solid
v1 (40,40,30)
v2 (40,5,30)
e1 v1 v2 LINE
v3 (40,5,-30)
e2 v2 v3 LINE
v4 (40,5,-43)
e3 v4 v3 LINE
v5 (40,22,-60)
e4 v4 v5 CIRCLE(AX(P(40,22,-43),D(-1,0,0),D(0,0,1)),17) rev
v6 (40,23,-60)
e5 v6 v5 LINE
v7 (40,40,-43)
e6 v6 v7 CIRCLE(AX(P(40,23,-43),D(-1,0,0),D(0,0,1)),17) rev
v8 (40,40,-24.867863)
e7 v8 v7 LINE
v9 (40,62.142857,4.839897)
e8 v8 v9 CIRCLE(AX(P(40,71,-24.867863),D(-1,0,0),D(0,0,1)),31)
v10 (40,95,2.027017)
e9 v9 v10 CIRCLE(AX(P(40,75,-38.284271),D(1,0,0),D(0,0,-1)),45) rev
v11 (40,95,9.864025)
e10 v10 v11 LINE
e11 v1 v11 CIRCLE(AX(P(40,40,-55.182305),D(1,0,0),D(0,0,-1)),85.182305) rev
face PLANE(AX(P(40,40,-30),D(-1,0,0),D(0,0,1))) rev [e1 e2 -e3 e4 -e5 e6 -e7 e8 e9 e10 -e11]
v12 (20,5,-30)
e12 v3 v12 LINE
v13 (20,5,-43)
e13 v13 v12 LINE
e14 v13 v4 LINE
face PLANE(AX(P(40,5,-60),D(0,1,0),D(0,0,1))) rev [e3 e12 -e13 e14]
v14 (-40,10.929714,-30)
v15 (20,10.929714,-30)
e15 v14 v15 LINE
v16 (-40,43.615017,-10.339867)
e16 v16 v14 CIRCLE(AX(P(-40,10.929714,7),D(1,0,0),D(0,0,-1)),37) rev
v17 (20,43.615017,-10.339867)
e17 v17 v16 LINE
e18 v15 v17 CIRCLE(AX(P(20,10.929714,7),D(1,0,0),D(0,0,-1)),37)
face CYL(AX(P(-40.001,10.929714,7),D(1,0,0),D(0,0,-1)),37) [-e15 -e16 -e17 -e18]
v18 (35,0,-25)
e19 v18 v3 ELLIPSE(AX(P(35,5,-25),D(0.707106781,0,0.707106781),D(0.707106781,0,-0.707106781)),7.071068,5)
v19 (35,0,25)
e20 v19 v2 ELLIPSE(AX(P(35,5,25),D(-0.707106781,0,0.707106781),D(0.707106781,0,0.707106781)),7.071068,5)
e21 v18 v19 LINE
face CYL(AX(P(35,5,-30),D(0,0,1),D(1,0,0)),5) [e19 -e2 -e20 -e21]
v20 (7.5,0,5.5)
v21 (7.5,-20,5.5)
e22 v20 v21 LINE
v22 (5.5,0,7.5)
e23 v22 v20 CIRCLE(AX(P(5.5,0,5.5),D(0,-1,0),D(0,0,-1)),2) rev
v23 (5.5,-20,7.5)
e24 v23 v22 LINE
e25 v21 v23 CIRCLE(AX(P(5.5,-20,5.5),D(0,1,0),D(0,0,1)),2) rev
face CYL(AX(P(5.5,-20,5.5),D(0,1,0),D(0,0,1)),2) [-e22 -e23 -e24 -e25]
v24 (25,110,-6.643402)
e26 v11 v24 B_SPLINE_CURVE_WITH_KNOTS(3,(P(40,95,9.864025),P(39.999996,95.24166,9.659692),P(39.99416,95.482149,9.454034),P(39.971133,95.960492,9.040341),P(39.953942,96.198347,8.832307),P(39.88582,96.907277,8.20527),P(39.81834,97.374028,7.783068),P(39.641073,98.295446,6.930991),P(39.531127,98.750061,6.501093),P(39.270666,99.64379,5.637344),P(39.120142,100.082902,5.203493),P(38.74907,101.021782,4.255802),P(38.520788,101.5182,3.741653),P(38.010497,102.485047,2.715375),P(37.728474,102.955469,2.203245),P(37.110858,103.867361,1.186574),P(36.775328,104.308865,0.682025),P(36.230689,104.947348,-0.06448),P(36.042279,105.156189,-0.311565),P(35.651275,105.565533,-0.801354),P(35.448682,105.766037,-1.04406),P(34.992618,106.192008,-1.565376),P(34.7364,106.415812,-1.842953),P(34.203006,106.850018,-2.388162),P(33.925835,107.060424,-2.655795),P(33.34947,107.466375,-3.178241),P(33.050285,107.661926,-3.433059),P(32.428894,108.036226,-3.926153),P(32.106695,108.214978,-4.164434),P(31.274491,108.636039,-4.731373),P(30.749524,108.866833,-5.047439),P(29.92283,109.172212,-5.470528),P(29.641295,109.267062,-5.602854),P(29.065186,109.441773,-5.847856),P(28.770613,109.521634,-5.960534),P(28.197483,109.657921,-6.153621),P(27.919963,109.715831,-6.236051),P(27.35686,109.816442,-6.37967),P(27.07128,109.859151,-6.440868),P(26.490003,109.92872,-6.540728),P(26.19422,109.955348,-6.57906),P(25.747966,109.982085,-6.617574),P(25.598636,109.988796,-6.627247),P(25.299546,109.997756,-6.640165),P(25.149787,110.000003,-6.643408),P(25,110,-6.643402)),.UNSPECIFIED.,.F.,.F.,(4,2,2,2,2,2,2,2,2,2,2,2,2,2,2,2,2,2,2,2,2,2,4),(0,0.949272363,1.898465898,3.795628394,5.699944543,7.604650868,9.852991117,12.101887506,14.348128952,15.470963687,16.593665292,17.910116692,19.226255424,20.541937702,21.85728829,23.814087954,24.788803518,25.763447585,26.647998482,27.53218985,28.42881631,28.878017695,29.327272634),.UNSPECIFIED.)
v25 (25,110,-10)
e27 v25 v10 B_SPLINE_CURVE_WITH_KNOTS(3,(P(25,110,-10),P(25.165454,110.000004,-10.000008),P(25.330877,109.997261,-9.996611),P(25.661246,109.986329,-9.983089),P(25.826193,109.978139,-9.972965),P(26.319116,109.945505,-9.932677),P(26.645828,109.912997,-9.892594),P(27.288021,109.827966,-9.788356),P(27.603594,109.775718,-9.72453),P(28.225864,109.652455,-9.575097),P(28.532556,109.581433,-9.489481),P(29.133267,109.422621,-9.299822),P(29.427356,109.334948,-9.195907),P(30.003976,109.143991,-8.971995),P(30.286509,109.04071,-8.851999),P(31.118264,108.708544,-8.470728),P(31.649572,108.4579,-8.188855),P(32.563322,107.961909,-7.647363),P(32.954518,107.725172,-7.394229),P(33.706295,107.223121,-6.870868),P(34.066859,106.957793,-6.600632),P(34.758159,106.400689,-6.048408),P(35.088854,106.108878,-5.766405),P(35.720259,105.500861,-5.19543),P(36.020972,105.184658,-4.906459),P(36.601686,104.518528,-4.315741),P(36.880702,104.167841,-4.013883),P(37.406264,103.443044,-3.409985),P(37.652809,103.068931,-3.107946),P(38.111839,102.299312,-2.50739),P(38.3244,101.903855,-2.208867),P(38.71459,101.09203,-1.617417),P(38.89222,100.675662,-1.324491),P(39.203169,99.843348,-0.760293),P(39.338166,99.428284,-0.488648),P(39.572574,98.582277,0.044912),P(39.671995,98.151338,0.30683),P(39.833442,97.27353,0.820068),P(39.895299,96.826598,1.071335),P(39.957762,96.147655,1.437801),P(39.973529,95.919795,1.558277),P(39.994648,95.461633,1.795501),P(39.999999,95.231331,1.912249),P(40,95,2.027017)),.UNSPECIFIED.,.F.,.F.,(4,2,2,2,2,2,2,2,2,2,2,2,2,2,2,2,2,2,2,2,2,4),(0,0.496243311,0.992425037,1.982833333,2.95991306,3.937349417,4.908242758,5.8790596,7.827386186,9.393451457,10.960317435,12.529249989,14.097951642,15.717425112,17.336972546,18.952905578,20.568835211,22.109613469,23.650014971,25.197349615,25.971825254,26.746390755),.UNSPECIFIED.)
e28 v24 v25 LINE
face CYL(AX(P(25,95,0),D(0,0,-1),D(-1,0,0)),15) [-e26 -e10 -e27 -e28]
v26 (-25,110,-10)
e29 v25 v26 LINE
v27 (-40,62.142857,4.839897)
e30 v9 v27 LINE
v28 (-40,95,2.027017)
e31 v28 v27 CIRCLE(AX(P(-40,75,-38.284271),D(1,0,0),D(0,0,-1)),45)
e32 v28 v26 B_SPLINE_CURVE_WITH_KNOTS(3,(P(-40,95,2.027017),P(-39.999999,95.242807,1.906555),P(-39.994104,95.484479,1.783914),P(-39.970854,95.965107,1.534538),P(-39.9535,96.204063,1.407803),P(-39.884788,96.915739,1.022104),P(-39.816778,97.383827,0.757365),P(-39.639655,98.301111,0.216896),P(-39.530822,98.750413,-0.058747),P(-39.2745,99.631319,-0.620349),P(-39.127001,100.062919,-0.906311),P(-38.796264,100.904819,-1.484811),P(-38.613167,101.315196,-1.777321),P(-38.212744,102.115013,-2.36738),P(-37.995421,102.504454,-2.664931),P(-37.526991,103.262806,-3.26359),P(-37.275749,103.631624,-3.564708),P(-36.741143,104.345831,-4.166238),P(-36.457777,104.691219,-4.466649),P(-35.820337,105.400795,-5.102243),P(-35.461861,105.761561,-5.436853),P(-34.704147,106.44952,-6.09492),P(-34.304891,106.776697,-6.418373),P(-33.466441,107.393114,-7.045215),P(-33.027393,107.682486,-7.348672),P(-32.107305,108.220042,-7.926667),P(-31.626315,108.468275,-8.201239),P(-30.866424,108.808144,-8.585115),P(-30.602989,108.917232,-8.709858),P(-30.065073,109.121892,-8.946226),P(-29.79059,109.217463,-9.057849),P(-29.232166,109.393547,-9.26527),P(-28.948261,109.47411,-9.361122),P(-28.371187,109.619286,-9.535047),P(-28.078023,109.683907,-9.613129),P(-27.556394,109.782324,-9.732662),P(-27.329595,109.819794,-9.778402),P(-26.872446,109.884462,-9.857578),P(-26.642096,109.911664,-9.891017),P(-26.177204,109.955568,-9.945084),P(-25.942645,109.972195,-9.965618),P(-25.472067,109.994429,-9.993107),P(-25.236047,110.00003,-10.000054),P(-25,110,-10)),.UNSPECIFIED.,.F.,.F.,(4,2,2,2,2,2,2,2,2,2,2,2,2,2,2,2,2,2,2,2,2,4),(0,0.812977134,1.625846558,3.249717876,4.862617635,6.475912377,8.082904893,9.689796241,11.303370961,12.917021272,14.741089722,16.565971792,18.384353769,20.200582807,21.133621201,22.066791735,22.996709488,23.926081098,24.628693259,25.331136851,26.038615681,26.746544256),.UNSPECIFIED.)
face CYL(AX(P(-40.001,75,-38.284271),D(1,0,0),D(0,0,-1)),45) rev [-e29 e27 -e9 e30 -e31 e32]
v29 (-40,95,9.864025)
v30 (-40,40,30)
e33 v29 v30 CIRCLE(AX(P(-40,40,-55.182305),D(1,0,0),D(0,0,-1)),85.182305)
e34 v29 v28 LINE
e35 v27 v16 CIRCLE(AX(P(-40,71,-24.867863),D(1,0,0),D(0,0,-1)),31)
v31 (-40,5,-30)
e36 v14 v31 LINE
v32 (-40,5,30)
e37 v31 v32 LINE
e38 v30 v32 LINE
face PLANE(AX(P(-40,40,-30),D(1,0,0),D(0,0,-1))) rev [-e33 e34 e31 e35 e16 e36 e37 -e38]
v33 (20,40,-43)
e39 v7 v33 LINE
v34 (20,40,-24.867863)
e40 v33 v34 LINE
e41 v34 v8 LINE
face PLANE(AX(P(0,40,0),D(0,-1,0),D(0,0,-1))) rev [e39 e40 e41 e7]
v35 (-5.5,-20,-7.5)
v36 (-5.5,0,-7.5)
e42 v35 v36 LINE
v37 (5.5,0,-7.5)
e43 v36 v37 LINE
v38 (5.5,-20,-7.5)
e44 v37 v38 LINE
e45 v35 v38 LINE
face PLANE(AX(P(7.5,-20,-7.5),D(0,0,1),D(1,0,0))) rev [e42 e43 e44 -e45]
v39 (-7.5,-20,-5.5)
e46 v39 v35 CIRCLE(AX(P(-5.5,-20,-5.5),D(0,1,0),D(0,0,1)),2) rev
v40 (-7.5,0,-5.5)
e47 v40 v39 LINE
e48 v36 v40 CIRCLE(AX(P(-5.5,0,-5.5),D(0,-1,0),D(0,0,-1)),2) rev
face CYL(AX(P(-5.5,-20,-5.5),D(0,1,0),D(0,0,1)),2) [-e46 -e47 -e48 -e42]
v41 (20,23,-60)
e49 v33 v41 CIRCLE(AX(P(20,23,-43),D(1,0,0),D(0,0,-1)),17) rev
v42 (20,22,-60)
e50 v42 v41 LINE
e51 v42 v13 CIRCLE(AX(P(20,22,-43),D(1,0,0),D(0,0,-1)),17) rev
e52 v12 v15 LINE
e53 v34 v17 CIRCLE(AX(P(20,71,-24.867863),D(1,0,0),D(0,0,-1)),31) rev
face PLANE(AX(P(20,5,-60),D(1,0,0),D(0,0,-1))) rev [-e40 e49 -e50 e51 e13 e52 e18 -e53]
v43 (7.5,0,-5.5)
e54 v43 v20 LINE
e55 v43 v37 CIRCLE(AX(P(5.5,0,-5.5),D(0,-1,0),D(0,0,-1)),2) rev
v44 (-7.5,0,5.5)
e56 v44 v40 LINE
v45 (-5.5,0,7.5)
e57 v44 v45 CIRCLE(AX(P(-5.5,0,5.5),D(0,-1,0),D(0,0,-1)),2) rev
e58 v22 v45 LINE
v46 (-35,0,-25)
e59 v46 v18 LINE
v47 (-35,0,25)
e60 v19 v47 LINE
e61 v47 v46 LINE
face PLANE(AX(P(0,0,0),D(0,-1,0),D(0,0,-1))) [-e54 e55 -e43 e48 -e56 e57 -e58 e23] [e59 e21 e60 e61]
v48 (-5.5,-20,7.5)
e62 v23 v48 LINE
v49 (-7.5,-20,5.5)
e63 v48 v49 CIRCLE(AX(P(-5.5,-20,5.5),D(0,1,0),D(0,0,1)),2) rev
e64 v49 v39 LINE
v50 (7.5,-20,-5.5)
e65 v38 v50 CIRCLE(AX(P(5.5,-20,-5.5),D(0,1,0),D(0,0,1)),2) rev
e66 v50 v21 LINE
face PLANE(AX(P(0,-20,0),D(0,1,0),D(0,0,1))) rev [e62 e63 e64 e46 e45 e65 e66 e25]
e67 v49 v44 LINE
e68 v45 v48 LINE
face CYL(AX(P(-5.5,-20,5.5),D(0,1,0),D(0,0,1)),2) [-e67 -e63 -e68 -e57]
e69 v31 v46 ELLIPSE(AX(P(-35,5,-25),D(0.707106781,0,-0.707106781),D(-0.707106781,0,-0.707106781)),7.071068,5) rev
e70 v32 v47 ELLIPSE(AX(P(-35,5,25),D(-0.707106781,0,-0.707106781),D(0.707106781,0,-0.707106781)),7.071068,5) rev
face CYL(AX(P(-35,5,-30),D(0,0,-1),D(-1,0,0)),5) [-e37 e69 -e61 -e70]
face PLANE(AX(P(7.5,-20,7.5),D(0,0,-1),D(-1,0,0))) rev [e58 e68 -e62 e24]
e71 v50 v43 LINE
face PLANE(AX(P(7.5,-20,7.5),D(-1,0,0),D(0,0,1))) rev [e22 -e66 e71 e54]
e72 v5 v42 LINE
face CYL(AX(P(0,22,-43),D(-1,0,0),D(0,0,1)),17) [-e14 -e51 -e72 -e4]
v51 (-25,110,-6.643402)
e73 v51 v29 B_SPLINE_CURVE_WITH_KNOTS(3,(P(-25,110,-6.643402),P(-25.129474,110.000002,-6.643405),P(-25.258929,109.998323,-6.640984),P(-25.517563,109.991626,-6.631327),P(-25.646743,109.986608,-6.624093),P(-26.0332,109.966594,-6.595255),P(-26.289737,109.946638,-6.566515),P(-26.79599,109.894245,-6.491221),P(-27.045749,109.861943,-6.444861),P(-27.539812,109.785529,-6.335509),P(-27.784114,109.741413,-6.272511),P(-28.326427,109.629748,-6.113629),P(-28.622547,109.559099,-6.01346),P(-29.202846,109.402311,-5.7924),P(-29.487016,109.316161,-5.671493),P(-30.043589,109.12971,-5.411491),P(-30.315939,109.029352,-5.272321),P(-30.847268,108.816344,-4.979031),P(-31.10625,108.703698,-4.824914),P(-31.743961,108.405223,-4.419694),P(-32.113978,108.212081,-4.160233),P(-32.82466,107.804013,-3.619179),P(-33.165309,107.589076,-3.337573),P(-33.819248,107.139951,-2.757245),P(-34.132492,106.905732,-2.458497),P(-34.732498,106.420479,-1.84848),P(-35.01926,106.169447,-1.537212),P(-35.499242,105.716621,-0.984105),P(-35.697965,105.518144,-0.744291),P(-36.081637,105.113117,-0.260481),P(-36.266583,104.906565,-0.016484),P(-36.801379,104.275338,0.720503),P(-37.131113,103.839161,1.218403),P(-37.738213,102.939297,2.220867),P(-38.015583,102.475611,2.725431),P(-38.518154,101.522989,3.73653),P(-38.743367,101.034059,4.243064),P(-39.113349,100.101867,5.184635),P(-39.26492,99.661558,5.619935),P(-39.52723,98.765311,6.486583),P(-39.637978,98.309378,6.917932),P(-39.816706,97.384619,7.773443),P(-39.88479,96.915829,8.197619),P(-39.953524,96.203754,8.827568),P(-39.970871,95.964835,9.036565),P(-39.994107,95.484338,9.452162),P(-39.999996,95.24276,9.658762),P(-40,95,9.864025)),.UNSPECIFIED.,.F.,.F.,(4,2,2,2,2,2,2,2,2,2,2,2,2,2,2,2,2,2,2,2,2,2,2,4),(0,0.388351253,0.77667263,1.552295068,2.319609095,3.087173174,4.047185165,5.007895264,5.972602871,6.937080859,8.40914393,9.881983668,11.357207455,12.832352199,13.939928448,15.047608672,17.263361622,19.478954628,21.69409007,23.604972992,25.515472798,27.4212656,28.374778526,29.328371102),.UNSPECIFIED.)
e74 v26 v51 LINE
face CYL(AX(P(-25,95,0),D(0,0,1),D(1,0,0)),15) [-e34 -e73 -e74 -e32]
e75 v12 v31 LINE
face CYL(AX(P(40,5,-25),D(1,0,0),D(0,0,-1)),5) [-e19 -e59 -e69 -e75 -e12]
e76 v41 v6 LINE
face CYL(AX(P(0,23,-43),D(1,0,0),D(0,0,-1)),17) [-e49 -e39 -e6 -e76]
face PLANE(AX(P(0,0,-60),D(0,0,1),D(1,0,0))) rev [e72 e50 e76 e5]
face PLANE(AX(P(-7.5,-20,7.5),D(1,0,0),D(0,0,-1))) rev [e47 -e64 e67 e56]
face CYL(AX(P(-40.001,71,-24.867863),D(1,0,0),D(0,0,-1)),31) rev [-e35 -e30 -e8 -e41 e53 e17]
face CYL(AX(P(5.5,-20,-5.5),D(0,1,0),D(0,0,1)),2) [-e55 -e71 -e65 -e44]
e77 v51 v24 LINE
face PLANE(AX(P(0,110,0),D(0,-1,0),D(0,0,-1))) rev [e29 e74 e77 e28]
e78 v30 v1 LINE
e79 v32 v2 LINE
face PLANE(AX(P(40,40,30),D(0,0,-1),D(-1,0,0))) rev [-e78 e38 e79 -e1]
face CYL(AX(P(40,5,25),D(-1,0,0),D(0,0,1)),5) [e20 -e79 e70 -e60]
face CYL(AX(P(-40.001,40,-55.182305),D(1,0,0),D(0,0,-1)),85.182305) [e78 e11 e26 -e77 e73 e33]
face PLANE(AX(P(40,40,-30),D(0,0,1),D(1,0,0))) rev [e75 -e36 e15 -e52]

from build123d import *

# Parameters (mm, degrees)
SKETCH1_W           = 80
SKETCH1_H           = 60
BOSS_EXTRUDE1_DEPTH = 40
SKETCH2_W           = 80
SKETCH2_H           = 40
BOSS_EXTRUDE2_DEPTH = 70
CUT_EXTRUDE1_REACH  = 141.284
FILLET4_R           = 31
FILLET6_R           = 5
FILLET7_R           = 15
SKETCH5_W           = 20
SKETCH5_H           = 35
BOSS_EXTRUDE4_DEPTH = 30
FILLET8_R           = 17
FILLET9_R           = 37
SKETCH6_W           = 15
SKETCH6_H           = 15
BOSS_EXTRUDE5_DEPTH = 20
FILLET10_R          = 2


with BuildPart() as part:
    # Sketch1 → Boss-Extrude1 (new body)
    with BuildSketch(Plane(origin=(0, 0, 0), x_dir=(1, 0, 0), z_dir=(0, 1, 0))):
        Rectangle(SKETCH1_W, SKETCH1_H)
    extrude(amount=BOSS_EXTRUDE1_DEPTH)

    # Sketch2 → Boss-Extrude2 (add)
    with BuildSketch(Plane(origin=(0, 40, 0), x_dir=(1, 0, 0), z_dir=(0, 1, 0))):
        with Locations((0, -10)):
            Rectangle(SKETCH2_W, SKETCH2_H)
    extrude(amount=BOSS_EXTRUDE2_DEPTH)

    # Sketch3 → Cut-Extrude1 (cut, up to next)
    with BuildSketch(Plane(origin=(40, 0, 0), x_dir=(0, 0, -1), z_dir=(1, 0, 0)), mode=Mode.PRIVATE) as cut_extrude1_sk1:
        with BuildLine():
            ThreePointArc((10, 110), (-6.715728753, 75), (10, 40))
            Line((10, 40), (10, 110))
        make_face()
    cut_extrude1_tool1 = extrude(cut_extrude1_sk1.sketch, amount=-CUT_EXTRUDE1_REACH, mode=Mode.PRIVATE) & part.part
    # Sketch3 → Cut-Extrude1 (cut, up to next)
    with BuildSketch(Plane(origin=(40, 0, 0), x_dir=(0, 0, -1), z_dir=(1, 0, 0)), mode=Mode.PRIVATE) as cut_extrude1_sk2:
        with BuildLine():
            ThreePointArc((-30, 40), (-20.28517386, 79.505502482), (6.643401936, 110))
            Line((6.643401936, 110), (-30, 110))
            Line((-30, 110), (-30, 40))
        make_face()
    cut_extrude1_tool2 = extrude(cut_extrude1_sk2.sketch, amount=-CUT_EXTRUDE1_REACH, mode=Mode.PRIVATE) & part.part
    add(cut_extrude1_tool1.solids().sort_by_distance((40, 75, -3.194337))[0], mode=Mode.SUBTRACT)
    add(cut_extrude1_tool2.solids().sort_by_distance((40, 93.341036, 19.578223))[0], mode=Mode.SUBTRACT)

    # Fillet4
    fillet4_edges = [part.edges().sort_by_distance(p)[0] for p in [
        (0, 40, -10),
    ]]
    fillet(fillet4_edges, radius=FILLET4_R)

    # Fillet6
    fillet6_edges = [part.edges().sort_by_distance(p)[0] for p in [
        (0, 0, -30),
        (40, 0, 0),
        (0, 0, 30),
        (-40, 0, 0),
    ]]
    fillet(fillet6_edges, radius=FILLET6_R)

    # Fillet7
    # the kernel refuses this fillet: 15 mm, written as the material it takes off along each edge
    with BuildSketch(Plane(origin=(-40, 110, -47.5), x_dir=(1, 0, 0), z_dir=(0, 0, 1))) as fillet7_piece_1:
        with BuildLine():
            CenterArc((FILLET7_R, -FILLET7_R), FILLET7_R, 90, 90)
            Line((0, -FILLET7_R), (0, 0))
            Line((0, 0), (FILLET7_R, 0))
        make_face()
    extrude(amount=78.356598064, mode=Mode.SUBTRACT)
    with BuildSketch(Plane(origin=(40, 110, 30.856598064), x_dir=(0, -1, 0), z_dir=(0, 0, -1))) as fillet7_piece_2:
        with BuildLine():
            CenterArc((FILLET7_R, FILLET7_R), FILLET7_R, 180, 90)
            Line((0, FILLET7_R), (0, 0))
            Line((0, 0), (FILLET7_R, 0))
        make_face()
    extrude(amount=78.356598064, mode=Mode.SUBTRACT)

    # Sketch5 → Boss-Extrude4 (add)
    with BuildSketch(Plane(origin=(0, 0, -30), x_dir=(-1, 0, 0), z_dir=(0, 0, -1))):
        with Locations((-30, 22.5)):
            Rectangle(SKETCH5_W, SKETCH5_H)
    extrude(amount=BOSS_EXTRUDE4_DEPTH)

    # Fillet8
    fillet8_edges = [part.edges().sort_by_distance(p)[0] for p in [
        (30, 5, -60),
        (30, 40, -60),
    ]]
    fillet(fillet8_edges, radius=FILLET8_R)

    # Fillet9
    # the kernel refuses this fillet: 37 mm, written as the material it takes off along each edge
    with BuildSketch(Plane(origin=(20, 40, -30), x_dir=(0, 0.18084372085202682, 0.9835118446812903), z_dir=(-1, 0, 0))) as fillet9_piece_1:
        with BuildLine():
            CenterArc((31.132759532, -35.282188472), FILLET9_R, 107.527471669, 62.053620325)
            Line((-5.257178722, -28.5909708), (-8.896172547, -27.921849033))
            Line((-8.896172547, -27.921849033), (-3.638993825, 0.669121767))
            Line((-3.638993825, 0.669121767), (0.669121767, 3.638993825))
            ThreePointArc((0.669121767, 3.638993825), (5.716638919, 2.710879143), (18.875423616, 3.528218847))
            Line((18.875423616, 3.528218847), (19.989726881, 0))
        make_face()
    extrude(amount=132.675715485, mode=Mode.SUBTRACT)

    # Sketch6 → Boss-Extrude5 (add)
    with BuildSketch(Plane.XZ):
        Rectangle(SKETCH6_W, SKETCH6_H)
    extrude(amount=BOSS_EXTRUDE5_DEPTH)

    # Fillet10
    fillet10_edges = [part.edges().sort_by_distance(p)[0] for p in [
        (-7.5, -10, 7.5),
        (-7.5, -10, -7.5),
        (7.5, -10, -7.5),
        (7.5, -10, 7.5),
    ]]
    fillet(fillet10_edges, radius=FILLET10_R)


solid = part.part
